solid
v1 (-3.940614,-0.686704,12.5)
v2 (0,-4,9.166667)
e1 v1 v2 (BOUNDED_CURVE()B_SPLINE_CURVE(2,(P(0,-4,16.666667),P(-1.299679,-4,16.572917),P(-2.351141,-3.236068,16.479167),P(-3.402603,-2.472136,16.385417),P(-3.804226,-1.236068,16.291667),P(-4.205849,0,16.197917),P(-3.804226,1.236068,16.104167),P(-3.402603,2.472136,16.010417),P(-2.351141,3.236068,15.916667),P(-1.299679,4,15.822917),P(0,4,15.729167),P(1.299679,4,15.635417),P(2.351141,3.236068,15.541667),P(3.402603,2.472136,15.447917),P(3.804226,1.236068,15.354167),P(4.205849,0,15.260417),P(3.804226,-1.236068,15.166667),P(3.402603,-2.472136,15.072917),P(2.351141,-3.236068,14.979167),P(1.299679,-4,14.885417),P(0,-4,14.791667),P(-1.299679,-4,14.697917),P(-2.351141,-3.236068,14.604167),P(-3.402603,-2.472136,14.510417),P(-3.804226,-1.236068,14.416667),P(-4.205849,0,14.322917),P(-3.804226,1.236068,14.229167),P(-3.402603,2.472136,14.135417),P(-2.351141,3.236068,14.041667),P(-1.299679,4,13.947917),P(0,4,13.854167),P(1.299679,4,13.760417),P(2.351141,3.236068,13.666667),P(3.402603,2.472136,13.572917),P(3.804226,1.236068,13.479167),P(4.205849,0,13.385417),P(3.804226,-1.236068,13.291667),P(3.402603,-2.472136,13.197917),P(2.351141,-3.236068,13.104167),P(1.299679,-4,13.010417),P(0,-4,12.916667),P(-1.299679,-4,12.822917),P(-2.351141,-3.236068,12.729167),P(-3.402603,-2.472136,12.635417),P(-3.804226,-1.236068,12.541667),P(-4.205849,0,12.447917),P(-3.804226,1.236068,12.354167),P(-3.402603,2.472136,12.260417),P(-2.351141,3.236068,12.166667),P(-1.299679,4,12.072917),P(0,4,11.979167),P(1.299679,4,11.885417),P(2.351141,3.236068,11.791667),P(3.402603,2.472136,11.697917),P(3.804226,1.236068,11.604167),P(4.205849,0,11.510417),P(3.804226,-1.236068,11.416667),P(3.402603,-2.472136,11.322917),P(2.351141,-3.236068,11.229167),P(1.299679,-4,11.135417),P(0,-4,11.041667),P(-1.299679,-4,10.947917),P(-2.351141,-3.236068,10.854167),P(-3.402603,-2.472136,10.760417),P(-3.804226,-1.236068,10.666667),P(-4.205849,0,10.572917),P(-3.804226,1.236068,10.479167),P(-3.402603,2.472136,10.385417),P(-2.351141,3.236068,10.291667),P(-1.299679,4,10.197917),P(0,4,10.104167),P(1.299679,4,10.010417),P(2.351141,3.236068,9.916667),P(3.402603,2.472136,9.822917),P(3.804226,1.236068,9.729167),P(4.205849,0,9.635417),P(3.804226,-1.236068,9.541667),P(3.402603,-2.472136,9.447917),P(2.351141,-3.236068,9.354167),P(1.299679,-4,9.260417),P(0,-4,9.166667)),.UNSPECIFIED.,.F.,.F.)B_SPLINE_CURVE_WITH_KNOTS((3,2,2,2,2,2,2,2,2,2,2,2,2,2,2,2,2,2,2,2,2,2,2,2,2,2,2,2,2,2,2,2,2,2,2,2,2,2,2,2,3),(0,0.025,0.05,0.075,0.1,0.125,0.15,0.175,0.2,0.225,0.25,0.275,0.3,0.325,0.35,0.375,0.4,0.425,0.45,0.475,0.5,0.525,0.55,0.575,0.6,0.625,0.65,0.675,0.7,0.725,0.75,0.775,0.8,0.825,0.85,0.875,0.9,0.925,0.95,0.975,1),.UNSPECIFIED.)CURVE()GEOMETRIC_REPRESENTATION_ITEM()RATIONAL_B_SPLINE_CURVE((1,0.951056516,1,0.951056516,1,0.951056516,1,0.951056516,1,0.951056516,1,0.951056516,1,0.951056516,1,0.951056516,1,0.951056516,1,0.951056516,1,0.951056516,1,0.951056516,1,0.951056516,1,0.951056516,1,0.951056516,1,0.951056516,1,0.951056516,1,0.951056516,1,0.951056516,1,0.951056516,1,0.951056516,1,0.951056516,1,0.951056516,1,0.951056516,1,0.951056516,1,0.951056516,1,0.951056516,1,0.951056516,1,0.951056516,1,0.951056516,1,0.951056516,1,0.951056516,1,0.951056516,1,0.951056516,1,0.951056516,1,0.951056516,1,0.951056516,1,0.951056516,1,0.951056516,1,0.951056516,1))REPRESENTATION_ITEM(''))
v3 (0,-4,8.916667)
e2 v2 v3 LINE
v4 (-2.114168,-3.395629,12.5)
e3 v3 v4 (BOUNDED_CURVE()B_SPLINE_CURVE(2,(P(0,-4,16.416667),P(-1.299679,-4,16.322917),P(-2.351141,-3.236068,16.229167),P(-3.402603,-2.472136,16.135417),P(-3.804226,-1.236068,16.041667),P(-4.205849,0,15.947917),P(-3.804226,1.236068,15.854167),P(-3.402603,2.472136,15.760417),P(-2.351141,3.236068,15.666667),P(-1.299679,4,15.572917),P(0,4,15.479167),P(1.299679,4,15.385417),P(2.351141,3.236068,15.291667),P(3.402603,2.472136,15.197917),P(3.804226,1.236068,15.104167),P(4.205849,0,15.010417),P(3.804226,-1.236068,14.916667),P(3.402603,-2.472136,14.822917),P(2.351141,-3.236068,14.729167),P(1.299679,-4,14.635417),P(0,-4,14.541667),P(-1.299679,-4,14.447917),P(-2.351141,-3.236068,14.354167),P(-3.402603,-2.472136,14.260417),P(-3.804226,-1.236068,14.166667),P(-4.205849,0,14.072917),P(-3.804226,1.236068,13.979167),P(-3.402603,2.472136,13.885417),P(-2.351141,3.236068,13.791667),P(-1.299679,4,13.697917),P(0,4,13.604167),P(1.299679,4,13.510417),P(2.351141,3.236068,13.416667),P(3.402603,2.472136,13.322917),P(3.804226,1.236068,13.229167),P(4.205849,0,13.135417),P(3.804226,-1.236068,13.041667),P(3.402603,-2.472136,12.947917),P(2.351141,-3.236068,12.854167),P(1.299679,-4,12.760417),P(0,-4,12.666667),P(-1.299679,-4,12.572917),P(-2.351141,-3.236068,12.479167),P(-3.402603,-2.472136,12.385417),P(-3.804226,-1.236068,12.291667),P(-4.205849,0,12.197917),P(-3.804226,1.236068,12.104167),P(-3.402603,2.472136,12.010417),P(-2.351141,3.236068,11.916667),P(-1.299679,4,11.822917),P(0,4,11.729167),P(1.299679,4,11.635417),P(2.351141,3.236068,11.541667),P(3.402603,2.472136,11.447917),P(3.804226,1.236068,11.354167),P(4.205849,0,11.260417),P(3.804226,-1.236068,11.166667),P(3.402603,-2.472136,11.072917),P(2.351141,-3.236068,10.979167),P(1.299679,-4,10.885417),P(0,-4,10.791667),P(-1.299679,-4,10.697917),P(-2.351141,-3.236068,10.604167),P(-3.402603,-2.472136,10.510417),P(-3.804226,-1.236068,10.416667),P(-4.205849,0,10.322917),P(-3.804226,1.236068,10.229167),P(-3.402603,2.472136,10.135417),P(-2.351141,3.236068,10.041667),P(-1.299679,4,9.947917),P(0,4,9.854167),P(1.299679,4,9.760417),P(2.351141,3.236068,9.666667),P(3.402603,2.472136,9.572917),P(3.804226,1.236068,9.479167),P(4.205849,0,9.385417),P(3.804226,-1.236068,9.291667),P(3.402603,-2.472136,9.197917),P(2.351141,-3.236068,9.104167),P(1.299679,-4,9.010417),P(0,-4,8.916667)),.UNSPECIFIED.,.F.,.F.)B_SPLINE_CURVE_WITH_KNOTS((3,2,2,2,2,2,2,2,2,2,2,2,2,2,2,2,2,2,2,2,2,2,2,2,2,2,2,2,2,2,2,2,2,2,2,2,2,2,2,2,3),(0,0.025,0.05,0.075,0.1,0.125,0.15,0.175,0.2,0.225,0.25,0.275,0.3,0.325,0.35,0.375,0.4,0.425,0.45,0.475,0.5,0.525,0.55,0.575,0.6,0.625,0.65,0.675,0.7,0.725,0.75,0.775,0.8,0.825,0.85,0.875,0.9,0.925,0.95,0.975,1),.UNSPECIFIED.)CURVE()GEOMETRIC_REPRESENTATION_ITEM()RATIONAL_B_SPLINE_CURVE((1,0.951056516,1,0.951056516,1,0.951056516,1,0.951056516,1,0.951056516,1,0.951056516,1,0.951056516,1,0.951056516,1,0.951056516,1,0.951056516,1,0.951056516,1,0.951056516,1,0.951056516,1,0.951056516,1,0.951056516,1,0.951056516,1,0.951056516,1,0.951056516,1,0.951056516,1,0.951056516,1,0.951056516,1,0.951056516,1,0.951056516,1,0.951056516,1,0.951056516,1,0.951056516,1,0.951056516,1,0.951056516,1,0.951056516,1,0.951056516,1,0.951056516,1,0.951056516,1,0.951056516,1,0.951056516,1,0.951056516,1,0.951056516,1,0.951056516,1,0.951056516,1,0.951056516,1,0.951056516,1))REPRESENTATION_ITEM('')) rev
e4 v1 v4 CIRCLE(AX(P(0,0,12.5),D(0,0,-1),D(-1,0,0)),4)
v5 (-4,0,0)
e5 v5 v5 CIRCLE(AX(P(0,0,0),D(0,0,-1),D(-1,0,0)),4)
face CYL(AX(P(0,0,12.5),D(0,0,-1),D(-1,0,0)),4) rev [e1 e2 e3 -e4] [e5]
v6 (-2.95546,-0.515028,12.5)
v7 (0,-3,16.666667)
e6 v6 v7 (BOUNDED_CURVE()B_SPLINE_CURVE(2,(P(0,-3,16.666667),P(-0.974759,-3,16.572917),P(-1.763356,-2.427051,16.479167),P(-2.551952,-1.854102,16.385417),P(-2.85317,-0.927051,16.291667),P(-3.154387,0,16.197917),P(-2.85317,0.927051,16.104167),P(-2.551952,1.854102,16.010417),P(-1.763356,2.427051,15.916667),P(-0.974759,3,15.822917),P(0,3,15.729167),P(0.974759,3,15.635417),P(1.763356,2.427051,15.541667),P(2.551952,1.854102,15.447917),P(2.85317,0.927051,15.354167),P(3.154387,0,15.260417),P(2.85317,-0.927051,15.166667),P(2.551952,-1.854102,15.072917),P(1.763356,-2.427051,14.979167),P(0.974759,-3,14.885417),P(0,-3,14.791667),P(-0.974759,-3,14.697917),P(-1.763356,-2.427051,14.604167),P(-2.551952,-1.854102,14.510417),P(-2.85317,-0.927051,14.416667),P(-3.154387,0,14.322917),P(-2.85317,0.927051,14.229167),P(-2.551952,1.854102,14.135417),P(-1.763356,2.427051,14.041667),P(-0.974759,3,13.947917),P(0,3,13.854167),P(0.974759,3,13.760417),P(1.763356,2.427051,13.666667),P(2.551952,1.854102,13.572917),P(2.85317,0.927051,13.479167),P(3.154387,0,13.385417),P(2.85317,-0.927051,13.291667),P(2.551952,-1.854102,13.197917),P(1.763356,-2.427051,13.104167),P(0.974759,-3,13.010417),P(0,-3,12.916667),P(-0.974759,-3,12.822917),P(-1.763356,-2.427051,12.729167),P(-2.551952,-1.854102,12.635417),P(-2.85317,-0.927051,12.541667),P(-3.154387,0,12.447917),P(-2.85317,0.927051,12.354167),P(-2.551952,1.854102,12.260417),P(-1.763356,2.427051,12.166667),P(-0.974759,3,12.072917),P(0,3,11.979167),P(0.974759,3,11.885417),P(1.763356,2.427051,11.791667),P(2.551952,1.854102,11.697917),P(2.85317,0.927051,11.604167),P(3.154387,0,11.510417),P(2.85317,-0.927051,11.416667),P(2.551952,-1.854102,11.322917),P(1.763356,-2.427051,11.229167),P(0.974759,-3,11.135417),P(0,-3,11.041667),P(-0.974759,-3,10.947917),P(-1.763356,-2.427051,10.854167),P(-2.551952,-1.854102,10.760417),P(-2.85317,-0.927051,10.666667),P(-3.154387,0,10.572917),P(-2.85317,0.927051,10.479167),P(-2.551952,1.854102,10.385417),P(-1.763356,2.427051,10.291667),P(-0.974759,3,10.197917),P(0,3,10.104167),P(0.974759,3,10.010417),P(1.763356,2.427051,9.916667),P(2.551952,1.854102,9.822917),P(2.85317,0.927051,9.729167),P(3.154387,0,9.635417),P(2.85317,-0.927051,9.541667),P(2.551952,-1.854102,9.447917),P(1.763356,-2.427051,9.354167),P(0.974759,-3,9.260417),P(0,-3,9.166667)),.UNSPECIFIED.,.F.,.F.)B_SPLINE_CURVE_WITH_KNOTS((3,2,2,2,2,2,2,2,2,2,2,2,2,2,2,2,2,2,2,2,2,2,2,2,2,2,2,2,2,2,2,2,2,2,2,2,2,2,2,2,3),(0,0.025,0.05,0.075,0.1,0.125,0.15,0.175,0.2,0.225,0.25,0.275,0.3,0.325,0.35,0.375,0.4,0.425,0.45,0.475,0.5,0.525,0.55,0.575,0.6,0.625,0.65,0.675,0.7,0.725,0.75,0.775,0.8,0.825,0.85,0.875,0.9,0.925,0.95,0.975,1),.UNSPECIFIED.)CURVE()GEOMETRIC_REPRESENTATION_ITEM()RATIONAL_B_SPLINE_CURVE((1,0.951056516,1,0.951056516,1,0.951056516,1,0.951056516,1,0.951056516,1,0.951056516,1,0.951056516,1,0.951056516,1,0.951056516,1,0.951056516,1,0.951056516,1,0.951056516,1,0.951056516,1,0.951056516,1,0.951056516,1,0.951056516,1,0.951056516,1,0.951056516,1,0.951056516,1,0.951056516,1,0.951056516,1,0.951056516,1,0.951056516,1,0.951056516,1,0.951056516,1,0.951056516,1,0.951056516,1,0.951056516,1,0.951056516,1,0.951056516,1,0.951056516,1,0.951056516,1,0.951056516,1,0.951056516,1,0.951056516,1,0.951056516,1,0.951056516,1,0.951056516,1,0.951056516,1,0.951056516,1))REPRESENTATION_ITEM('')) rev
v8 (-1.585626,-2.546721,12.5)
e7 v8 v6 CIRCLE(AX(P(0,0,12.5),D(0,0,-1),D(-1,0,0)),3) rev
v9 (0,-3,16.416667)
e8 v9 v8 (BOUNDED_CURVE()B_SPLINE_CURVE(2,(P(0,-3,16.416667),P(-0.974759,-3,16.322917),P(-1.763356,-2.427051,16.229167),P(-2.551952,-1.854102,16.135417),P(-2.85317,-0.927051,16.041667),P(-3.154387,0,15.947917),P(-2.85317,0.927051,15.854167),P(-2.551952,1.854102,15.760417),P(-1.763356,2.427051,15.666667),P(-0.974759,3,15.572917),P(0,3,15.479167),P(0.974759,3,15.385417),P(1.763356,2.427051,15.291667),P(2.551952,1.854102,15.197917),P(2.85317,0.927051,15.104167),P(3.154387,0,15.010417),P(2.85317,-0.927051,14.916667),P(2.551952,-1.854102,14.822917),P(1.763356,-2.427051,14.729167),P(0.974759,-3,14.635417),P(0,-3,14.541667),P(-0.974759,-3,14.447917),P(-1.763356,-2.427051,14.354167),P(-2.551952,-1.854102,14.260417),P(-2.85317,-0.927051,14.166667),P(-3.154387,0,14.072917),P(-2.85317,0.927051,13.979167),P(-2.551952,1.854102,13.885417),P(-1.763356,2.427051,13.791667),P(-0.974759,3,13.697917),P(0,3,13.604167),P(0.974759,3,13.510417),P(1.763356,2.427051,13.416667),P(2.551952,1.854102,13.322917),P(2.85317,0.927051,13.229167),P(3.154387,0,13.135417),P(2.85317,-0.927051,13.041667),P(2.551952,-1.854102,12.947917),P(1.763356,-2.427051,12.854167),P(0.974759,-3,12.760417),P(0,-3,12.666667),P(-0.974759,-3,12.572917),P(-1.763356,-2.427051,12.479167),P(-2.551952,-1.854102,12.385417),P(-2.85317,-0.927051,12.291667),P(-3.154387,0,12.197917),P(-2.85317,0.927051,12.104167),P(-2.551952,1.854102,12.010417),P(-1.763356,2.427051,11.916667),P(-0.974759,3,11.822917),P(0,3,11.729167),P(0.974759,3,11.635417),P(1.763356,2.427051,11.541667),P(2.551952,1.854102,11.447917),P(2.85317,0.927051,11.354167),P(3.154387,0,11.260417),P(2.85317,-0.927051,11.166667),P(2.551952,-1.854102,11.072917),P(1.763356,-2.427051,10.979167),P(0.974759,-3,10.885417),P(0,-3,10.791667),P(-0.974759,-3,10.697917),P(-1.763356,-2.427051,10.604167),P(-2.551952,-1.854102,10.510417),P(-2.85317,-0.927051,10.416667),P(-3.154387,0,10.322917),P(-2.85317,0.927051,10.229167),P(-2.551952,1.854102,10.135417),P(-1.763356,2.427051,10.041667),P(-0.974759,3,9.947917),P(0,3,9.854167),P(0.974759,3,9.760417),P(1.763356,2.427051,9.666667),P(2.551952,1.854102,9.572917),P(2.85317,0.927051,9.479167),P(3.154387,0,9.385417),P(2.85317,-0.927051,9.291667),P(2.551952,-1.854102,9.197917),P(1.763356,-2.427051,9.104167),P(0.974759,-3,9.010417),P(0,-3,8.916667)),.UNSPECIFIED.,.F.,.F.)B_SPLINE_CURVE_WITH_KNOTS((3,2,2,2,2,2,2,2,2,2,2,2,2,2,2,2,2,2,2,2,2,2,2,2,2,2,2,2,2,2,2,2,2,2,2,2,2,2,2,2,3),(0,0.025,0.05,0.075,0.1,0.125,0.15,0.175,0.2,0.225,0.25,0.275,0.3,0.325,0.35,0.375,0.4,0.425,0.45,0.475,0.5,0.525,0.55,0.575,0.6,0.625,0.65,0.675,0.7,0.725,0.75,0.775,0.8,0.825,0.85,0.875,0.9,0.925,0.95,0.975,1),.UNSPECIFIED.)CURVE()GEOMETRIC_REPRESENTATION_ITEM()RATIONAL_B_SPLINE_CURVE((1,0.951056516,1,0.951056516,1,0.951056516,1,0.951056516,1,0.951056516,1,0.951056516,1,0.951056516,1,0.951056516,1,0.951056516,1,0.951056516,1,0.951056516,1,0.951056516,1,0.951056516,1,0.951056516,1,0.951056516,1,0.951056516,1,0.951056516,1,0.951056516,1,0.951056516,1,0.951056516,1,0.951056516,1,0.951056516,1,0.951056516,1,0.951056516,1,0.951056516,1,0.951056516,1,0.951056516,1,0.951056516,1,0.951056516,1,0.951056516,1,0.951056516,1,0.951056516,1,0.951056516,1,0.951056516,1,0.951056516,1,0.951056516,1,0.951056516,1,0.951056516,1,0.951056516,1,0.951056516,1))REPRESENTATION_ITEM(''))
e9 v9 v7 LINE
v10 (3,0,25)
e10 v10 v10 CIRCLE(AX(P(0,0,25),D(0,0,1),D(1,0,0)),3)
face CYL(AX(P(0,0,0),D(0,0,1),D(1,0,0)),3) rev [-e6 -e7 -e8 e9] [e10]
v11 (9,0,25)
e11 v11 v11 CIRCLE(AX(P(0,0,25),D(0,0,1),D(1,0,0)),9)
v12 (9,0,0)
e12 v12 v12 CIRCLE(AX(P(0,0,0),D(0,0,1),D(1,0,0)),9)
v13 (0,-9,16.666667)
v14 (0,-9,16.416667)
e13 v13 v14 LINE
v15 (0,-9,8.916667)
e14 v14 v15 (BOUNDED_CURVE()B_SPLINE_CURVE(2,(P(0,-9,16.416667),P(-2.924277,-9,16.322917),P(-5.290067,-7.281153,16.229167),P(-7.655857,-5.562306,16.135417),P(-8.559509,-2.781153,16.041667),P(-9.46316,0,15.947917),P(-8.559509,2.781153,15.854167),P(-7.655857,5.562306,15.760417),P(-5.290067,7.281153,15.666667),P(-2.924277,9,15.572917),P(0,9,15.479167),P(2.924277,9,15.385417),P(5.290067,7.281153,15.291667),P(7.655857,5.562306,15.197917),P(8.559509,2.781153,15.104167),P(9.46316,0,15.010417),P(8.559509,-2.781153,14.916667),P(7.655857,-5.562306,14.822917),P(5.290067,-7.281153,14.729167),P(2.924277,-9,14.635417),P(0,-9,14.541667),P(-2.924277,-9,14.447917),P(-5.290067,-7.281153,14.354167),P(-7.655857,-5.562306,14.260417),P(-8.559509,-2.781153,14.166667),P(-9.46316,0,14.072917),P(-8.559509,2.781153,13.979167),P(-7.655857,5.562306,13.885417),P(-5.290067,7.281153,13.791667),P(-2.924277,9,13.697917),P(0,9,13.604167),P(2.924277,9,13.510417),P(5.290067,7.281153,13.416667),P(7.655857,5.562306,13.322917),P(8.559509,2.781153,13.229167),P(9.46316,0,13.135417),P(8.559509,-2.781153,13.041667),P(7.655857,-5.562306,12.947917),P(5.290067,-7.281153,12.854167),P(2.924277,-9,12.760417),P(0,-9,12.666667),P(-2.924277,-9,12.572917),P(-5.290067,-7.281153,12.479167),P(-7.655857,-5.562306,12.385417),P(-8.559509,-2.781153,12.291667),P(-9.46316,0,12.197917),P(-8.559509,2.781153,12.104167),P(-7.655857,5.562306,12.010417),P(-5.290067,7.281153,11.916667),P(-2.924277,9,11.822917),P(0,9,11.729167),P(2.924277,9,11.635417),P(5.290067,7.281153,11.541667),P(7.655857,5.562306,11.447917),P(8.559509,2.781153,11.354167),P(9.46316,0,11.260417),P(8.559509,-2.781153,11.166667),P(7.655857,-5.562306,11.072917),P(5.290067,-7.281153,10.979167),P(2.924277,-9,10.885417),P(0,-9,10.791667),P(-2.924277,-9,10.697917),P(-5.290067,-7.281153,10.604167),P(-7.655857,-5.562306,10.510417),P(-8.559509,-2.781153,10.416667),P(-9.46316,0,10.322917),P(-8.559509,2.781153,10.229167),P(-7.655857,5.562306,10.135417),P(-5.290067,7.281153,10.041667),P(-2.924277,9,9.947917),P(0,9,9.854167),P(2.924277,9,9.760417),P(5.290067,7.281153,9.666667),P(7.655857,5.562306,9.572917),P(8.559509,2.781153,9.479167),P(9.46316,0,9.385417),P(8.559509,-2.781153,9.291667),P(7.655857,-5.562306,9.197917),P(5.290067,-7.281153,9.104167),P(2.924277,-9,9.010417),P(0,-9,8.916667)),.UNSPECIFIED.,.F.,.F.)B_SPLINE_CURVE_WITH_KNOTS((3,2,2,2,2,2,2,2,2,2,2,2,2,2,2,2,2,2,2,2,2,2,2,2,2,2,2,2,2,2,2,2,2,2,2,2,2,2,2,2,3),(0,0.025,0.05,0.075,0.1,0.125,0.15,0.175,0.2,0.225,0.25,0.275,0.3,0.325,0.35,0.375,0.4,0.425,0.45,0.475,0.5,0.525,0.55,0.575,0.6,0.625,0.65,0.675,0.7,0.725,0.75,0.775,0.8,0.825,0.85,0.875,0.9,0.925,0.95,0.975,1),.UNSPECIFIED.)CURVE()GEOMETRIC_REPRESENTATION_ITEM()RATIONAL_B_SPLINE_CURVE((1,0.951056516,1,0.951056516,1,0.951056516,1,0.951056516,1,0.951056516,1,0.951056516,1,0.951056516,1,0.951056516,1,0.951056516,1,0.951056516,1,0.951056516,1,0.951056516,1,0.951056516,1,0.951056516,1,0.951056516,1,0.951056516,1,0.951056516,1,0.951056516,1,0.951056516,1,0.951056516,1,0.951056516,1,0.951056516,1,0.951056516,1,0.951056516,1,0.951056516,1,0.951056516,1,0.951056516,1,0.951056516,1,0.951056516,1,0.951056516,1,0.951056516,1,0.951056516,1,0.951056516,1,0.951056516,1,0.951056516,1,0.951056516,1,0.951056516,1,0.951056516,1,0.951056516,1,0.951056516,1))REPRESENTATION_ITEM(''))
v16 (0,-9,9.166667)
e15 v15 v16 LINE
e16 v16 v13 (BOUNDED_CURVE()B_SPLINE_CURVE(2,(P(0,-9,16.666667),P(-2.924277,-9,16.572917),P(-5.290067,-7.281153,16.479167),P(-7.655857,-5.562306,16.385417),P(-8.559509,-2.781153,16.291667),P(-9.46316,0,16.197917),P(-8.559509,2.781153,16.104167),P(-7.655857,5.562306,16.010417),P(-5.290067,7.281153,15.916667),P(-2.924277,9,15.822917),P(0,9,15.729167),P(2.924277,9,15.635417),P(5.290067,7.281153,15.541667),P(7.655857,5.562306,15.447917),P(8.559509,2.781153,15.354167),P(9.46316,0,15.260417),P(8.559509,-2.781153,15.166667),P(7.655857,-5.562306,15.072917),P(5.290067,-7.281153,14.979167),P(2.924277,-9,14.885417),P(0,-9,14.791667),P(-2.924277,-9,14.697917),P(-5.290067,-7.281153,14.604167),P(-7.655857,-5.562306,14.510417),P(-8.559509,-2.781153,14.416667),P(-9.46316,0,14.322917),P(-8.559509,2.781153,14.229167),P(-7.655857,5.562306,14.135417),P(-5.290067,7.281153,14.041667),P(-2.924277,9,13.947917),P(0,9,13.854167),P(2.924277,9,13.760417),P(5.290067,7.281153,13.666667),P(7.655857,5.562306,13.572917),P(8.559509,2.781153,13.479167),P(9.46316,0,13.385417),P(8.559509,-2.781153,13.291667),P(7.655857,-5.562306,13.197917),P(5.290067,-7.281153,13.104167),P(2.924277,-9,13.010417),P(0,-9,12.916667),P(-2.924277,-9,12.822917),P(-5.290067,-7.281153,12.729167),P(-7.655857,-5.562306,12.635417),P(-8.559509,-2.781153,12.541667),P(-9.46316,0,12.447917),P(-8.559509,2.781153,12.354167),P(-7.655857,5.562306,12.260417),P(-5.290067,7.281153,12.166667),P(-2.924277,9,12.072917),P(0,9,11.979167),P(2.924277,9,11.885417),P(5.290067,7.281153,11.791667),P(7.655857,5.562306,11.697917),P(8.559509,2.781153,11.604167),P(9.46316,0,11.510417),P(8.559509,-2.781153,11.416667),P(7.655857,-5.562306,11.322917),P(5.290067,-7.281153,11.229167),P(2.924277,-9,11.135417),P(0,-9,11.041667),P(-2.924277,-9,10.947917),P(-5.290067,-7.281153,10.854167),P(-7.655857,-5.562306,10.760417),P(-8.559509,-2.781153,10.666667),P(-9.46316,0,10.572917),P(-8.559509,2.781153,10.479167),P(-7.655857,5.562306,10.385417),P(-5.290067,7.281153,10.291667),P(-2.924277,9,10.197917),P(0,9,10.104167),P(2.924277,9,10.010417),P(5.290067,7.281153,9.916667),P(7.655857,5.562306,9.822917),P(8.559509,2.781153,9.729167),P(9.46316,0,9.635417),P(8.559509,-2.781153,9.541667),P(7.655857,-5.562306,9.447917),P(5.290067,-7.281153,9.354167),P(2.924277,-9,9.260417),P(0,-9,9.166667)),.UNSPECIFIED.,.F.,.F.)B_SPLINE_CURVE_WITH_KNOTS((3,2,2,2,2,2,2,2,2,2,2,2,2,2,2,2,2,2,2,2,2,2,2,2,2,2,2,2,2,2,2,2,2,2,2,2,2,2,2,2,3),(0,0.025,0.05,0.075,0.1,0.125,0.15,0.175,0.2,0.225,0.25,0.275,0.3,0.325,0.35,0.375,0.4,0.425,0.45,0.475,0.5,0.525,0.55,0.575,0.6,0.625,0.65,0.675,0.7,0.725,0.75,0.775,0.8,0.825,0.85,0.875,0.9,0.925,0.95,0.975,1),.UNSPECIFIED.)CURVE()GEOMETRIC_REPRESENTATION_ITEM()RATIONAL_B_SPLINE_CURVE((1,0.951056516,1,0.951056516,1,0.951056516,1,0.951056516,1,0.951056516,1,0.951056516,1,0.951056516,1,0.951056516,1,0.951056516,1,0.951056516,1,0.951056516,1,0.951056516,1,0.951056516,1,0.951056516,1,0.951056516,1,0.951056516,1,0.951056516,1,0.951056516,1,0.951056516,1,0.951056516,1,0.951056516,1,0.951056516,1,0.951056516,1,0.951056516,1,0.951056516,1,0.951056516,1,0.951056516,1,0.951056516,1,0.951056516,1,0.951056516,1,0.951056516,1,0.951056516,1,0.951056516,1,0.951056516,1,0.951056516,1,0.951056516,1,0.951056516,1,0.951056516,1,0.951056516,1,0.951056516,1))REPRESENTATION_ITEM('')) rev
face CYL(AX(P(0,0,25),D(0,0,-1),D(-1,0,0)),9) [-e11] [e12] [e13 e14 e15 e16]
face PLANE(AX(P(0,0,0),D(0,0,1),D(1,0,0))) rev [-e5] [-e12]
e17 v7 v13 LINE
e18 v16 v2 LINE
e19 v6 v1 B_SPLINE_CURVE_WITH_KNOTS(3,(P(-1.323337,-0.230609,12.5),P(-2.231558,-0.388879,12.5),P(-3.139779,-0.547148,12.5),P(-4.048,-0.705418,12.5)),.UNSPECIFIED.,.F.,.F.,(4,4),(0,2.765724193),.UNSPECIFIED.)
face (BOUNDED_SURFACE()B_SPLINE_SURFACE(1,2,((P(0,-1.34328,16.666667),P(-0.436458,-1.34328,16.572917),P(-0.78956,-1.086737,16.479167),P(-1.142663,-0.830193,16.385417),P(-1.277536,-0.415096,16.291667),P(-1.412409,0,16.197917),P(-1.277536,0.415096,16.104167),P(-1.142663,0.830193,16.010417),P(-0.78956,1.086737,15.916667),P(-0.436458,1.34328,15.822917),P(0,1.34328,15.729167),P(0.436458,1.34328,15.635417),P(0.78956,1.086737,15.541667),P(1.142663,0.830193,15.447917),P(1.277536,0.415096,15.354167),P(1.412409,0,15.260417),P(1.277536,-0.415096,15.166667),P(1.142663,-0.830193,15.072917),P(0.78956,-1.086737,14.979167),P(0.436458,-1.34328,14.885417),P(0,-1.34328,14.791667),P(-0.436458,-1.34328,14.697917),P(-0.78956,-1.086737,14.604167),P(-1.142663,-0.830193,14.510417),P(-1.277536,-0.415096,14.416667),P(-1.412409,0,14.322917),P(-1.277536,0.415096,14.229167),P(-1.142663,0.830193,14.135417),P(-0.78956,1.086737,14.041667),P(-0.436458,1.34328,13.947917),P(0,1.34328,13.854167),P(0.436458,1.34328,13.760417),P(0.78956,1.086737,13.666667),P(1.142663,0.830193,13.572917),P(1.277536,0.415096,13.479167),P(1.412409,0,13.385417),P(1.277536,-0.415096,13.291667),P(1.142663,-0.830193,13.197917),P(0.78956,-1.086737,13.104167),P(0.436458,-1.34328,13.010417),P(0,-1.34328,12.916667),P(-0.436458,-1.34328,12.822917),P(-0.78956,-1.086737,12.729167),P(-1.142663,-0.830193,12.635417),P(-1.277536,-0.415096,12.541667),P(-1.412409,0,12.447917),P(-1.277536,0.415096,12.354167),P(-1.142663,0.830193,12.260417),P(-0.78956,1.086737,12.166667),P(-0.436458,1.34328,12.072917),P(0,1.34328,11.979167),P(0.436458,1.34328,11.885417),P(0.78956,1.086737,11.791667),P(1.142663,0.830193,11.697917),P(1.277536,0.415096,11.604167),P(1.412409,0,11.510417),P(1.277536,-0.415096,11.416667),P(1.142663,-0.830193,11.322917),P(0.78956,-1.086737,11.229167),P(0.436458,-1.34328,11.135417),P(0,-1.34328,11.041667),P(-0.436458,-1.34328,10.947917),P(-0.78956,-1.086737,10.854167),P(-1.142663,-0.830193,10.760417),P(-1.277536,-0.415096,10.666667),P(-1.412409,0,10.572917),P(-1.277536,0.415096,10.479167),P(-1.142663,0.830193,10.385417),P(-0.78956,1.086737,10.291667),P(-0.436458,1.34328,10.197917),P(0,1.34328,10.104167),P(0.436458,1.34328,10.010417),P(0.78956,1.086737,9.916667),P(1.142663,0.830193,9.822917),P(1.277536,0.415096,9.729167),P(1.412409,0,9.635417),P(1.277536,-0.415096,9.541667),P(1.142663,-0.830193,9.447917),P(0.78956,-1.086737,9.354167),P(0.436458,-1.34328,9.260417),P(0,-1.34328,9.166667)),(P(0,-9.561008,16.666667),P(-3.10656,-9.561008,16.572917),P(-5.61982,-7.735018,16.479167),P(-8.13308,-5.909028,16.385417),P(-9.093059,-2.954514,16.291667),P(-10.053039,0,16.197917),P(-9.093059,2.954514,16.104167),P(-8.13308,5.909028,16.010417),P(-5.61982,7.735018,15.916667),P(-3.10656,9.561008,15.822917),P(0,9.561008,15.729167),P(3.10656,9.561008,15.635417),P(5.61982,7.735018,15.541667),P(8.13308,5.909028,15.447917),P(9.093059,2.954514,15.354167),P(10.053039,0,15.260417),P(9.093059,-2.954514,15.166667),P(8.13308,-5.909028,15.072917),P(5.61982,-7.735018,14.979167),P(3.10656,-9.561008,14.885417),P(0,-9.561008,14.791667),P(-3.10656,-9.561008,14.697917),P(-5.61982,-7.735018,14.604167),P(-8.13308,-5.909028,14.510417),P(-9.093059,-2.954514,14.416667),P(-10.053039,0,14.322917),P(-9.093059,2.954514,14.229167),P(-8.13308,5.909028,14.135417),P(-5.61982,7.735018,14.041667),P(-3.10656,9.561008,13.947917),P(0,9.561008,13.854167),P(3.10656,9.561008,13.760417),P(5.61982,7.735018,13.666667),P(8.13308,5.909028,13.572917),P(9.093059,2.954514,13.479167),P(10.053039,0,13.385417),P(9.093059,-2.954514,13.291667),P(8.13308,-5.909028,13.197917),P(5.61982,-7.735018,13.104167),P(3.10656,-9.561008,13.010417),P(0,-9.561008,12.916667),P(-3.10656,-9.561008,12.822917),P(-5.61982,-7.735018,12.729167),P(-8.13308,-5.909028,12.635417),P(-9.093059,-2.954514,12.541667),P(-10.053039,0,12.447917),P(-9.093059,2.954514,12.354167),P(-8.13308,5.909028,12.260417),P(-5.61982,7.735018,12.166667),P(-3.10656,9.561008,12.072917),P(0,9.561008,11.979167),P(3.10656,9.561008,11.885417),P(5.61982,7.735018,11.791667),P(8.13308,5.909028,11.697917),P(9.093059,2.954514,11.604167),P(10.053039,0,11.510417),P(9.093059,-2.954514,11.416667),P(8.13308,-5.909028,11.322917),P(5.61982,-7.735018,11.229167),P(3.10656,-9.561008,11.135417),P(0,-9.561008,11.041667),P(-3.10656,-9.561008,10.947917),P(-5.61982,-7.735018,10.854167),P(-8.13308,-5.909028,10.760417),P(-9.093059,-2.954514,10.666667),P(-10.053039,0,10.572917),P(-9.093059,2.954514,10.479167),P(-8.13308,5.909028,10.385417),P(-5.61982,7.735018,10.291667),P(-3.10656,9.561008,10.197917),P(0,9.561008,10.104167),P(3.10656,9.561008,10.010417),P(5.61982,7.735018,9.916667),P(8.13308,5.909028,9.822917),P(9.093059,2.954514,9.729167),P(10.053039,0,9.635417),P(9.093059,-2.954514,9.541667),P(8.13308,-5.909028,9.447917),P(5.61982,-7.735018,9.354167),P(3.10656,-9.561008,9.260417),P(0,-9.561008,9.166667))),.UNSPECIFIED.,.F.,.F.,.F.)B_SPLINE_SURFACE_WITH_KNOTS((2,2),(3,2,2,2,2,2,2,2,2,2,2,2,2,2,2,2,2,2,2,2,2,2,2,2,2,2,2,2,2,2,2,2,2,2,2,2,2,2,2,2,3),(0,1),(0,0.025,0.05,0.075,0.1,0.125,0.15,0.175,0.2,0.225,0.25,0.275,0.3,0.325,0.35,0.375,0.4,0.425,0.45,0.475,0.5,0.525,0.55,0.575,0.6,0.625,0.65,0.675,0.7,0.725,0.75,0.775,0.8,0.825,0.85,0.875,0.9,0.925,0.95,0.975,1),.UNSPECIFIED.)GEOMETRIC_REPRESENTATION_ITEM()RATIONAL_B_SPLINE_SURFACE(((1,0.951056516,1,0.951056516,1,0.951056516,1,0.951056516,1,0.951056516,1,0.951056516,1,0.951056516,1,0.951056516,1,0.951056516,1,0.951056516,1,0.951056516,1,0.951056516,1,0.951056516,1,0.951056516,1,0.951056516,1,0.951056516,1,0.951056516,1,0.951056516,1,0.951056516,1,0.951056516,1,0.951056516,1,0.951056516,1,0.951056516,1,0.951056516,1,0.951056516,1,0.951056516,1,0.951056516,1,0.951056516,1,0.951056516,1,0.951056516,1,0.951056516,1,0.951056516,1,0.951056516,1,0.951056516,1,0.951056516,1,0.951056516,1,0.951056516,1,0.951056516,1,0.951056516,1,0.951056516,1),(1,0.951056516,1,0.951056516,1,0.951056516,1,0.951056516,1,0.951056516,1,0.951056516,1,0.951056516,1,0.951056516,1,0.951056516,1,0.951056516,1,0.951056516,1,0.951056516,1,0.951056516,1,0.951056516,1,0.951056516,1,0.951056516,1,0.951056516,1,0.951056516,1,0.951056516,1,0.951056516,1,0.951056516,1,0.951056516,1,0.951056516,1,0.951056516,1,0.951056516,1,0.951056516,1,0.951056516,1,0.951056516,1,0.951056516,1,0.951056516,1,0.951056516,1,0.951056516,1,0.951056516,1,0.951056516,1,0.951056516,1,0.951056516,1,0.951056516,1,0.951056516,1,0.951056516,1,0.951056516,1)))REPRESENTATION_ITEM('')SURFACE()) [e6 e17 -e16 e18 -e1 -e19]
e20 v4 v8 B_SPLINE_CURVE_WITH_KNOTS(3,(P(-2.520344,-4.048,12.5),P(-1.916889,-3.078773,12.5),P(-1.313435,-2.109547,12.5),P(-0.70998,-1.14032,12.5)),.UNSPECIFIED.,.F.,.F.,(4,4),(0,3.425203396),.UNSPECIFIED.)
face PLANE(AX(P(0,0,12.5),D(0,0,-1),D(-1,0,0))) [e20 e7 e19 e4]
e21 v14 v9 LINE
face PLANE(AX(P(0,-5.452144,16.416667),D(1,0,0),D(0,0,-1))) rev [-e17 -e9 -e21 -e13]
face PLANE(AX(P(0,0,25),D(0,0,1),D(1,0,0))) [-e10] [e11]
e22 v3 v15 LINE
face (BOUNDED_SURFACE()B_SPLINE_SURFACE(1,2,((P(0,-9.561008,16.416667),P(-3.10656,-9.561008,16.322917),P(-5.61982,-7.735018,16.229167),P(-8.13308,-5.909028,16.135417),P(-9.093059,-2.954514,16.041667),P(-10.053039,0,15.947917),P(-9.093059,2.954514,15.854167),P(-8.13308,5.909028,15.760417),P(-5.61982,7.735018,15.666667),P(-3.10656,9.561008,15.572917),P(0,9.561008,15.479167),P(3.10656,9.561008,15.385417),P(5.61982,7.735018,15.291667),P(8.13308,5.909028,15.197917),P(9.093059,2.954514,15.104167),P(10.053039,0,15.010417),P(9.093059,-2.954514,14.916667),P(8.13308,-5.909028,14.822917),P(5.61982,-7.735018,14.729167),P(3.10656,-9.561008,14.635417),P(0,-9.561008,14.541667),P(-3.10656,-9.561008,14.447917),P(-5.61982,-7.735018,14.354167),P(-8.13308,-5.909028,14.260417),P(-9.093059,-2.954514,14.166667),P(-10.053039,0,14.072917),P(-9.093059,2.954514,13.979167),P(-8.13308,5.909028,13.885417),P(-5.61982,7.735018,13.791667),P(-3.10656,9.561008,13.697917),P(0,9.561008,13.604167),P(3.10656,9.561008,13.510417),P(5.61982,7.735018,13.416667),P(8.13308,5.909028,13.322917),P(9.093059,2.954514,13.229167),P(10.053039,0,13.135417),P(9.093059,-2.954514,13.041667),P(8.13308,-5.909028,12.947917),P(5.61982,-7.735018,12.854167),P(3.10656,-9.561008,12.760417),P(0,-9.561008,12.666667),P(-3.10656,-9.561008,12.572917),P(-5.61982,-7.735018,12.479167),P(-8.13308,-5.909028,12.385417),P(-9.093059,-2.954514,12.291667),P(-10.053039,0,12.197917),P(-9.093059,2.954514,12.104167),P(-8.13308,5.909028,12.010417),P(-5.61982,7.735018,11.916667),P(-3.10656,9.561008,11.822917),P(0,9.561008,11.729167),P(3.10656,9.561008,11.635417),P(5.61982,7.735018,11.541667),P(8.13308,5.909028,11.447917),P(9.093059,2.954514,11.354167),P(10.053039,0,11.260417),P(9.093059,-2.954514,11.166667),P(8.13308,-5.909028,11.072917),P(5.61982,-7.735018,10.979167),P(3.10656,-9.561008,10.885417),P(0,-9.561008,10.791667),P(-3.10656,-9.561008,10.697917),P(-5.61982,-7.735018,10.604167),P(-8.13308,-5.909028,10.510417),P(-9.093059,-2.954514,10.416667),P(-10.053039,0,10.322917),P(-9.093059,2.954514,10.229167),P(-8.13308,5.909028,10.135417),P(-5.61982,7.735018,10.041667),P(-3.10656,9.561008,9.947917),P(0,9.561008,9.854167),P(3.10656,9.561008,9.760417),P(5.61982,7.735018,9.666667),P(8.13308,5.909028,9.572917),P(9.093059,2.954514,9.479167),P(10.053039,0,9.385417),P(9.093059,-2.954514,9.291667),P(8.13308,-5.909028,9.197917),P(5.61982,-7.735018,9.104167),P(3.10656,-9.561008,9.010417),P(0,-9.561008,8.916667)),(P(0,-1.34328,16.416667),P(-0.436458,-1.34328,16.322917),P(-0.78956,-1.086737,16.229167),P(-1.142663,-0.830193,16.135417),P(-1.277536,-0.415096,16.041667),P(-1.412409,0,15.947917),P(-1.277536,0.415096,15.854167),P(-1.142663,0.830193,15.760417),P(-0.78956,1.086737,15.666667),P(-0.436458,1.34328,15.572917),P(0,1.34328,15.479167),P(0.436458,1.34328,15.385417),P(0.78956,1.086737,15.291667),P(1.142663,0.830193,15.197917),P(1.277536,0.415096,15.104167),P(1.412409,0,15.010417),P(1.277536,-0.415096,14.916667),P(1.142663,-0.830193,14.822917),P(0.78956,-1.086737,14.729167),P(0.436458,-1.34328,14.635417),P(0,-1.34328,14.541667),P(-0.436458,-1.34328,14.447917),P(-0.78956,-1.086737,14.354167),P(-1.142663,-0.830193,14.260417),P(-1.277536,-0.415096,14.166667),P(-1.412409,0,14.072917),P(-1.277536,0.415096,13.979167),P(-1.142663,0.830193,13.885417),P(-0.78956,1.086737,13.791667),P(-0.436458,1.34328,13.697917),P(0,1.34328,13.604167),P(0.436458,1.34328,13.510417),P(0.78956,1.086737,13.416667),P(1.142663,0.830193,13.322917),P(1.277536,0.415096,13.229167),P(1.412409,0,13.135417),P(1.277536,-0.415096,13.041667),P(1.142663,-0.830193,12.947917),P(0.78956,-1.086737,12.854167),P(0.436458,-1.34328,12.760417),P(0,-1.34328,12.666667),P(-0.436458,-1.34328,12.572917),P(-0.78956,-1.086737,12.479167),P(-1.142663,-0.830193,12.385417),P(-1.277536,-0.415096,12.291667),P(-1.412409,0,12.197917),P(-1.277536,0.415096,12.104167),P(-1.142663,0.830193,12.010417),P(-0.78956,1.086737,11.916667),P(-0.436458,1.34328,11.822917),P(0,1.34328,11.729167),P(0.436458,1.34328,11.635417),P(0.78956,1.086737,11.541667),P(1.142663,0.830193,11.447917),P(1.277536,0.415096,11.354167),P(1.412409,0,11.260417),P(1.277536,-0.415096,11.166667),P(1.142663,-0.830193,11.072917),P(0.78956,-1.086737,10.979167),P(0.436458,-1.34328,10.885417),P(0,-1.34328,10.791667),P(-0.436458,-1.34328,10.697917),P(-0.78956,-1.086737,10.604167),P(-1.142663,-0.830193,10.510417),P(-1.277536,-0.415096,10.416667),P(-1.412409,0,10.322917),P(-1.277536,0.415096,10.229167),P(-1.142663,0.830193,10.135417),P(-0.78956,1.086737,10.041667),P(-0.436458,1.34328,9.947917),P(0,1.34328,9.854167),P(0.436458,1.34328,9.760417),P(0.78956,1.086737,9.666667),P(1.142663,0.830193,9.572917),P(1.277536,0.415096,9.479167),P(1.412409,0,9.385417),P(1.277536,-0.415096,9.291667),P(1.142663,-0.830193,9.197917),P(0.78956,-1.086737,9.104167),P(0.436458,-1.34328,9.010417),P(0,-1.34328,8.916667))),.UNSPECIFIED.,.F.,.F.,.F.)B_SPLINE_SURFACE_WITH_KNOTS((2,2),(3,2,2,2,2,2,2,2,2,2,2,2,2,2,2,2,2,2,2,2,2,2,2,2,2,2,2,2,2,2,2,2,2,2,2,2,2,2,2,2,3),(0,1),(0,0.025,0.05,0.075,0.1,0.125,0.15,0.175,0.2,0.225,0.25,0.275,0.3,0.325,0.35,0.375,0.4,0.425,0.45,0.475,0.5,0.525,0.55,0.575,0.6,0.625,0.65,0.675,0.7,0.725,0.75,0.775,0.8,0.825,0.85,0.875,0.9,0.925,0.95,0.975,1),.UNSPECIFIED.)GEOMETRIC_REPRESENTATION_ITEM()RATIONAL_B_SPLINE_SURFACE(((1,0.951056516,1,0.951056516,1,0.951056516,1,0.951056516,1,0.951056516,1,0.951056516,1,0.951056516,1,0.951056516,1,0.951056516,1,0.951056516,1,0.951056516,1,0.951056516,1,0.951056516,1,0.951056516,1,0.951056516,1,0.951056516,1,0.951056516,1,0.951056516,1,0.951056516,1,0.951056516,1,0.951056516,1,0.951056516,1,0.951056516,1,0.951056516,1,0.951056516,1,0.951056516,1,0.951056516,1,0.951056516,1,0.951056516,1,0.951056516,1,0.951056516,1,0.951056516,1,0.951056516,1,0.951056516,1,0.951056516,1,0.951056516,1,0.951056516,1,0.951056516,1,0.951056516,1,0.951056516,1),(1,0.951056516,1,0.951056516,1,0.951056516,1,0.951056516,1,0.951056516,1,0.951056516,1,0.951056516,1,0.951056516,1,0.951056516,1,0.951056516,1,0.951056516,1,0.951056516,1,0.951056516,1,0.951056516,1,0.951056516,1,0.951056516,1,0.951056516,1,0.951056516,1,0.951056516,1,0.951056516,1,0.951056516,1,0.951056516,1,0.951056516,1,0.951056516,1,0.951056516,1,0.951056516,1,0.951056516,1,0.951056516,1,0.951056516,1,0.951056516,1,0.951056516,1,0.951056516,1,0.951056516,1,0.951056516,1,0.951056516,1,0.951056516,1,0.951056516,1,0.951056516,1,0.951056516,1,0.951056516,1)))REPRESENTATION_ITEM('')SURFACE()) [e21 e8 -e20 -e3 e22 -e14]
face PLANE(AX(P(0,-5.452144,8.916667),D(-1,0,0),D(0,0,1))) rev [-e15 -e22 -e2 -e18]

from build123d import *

# Parameters (mm, degrees)
SKETCH1_R           = 9
BOSS_EXTRUDE1_DEPTH = 25
SKETCH2_R           = 3
CUT_EXTRUDE1_DEPTH  = 25
SKETCH3_R           = 4
CUT_EXTRUDE2_DEPTH  = 12.5
CUT_SWEEP1_PITCH    = 1.875


with BuildPart() as part:
    # Sketch1 → Boss-Extrude1 (new body)
    with BuildSketch(Plane.XY):
        Circle(SKETCH1_R)
    extrude(amount=BOSS_EXTRUDE1_DEPTH)

    # Sketch2 → Cut-Extrude1 (cut)
    with BuildSketch(Plane.XY.offset(25)):
        Circle(SKETCH2_R)
    extrude(amount=-CUT_EXTRUDE1_DEPTH, mode=Mode.SUBTRACT)

    # Sketch3 → Cut-Extrude2 (cut)
    with BuildSketch(Plane(origin=(0, 0, 0), x_dir=(-1, 0, 0), z_dir=(0, 0, -1))):
        Circle(SKETCH3_R)
    extrude(amount=-CUT_EXTRUDE2_DEPTH, mode=Mode.SUBTRACT)

    # Cut-Sweep1: the profile of Sketch4 screwed along a right-hand helix of 4 turns, 10 arcs to a turn; built about Z, then put on its axis
    cut_sweep1_z = Axis((0, 0, 0), (0, 0, 1))
    cut_sweep1_corners = [(1.343280354, 0, 0), (1.343280354, 0, 0.25), (9.561008436, 0, 0.25), (9.561008436, 0, 0)]
    with BuildLine(mode=Mode.PRIVATE) as cut_sweep1_profile:
        Line(cut_sweep1_corners[0], cut_sweep1_corners[1])
        Line(cut_sweep1_corners[1], cut_sweep1_corners[2])
        Line(cut_sweep1_corners[2], cut_sweep1_corners[3])
        Line(cut_sweep1_corners[3], cut_sweep1_corners[0])
    cut_sweep1_cap = Face(cut_sweep1_profile.wire())
    cut_sweep1_turn_angles = [0, 18, 36, 54, 72, 90, 108, 126, 144, 162, 180, 198, 216, 234, 252, 270, 288, 306, 324, 342, 360]
    cut_sweep1_turn_weights = [1, 0.9510565162951535, 1, 0.9510565162951535, 1, 0.9510565162951535, 1, 0.9510565162951535, 1, 0.9510565162951535, 1, 0.9510565162951535, 1, 0.9510565162951535, 1, 0.9510565162951535, 1, 0.9510565162951535, 1, 0.9510565162951535, 1]
    cut_sweep1_turn_rails = [Edge.make_bspline([Vector(p[0], p[1], 0).rotate(cut_sweep1_z, cut_sweep1_turn_angles[k]) / cut_sweep1_turn_weights[k] + Vector(0, 0, p[2] + CUT_SWEEP1_PITCH * cut_sweep1_turn_angles[k] / 360) for k in range(21)], [0, 0, 0, 1, 1, 2, 2, 3, 3, 4, 4, 5, 5, 6, 6, 7, 7, 8, 8, 9, 9, 10, 10, 10], 2, cut_sweep1_turn_weights) for p in cut_sweep1_corners]
    cut_sweep1_turn_sides = [Face.make_surface_from_curves(cut_sweep1_turn_rails[p[0]], cut_sweep1_turn_rails[p[1]]) for p in [(0, 1), (1, 2), (2, 3), (3, 0)]]
    cut_sweep1 = Plane(origin=(0, 0, 16.66666667), x_dir=(0, -1, 0), z_dir=(0, 0, -1)) * Solid(Shell([*[p.moved(Location((0, 0, CUT_SWEEP1_PITCH * i))) for i in range(4) for p in cut_sweep1_turn_sides], cut_sweep1_cap, cut_sweep1_cap.rotate(cut_sweep1_z, 1440).moved(Location((0, 0, CUT_SWEEP1_PITCH * 1440 / 360)))]))
    add(cut_sweep1, mode=Mode.SUBTRACT)


solid = part.part
